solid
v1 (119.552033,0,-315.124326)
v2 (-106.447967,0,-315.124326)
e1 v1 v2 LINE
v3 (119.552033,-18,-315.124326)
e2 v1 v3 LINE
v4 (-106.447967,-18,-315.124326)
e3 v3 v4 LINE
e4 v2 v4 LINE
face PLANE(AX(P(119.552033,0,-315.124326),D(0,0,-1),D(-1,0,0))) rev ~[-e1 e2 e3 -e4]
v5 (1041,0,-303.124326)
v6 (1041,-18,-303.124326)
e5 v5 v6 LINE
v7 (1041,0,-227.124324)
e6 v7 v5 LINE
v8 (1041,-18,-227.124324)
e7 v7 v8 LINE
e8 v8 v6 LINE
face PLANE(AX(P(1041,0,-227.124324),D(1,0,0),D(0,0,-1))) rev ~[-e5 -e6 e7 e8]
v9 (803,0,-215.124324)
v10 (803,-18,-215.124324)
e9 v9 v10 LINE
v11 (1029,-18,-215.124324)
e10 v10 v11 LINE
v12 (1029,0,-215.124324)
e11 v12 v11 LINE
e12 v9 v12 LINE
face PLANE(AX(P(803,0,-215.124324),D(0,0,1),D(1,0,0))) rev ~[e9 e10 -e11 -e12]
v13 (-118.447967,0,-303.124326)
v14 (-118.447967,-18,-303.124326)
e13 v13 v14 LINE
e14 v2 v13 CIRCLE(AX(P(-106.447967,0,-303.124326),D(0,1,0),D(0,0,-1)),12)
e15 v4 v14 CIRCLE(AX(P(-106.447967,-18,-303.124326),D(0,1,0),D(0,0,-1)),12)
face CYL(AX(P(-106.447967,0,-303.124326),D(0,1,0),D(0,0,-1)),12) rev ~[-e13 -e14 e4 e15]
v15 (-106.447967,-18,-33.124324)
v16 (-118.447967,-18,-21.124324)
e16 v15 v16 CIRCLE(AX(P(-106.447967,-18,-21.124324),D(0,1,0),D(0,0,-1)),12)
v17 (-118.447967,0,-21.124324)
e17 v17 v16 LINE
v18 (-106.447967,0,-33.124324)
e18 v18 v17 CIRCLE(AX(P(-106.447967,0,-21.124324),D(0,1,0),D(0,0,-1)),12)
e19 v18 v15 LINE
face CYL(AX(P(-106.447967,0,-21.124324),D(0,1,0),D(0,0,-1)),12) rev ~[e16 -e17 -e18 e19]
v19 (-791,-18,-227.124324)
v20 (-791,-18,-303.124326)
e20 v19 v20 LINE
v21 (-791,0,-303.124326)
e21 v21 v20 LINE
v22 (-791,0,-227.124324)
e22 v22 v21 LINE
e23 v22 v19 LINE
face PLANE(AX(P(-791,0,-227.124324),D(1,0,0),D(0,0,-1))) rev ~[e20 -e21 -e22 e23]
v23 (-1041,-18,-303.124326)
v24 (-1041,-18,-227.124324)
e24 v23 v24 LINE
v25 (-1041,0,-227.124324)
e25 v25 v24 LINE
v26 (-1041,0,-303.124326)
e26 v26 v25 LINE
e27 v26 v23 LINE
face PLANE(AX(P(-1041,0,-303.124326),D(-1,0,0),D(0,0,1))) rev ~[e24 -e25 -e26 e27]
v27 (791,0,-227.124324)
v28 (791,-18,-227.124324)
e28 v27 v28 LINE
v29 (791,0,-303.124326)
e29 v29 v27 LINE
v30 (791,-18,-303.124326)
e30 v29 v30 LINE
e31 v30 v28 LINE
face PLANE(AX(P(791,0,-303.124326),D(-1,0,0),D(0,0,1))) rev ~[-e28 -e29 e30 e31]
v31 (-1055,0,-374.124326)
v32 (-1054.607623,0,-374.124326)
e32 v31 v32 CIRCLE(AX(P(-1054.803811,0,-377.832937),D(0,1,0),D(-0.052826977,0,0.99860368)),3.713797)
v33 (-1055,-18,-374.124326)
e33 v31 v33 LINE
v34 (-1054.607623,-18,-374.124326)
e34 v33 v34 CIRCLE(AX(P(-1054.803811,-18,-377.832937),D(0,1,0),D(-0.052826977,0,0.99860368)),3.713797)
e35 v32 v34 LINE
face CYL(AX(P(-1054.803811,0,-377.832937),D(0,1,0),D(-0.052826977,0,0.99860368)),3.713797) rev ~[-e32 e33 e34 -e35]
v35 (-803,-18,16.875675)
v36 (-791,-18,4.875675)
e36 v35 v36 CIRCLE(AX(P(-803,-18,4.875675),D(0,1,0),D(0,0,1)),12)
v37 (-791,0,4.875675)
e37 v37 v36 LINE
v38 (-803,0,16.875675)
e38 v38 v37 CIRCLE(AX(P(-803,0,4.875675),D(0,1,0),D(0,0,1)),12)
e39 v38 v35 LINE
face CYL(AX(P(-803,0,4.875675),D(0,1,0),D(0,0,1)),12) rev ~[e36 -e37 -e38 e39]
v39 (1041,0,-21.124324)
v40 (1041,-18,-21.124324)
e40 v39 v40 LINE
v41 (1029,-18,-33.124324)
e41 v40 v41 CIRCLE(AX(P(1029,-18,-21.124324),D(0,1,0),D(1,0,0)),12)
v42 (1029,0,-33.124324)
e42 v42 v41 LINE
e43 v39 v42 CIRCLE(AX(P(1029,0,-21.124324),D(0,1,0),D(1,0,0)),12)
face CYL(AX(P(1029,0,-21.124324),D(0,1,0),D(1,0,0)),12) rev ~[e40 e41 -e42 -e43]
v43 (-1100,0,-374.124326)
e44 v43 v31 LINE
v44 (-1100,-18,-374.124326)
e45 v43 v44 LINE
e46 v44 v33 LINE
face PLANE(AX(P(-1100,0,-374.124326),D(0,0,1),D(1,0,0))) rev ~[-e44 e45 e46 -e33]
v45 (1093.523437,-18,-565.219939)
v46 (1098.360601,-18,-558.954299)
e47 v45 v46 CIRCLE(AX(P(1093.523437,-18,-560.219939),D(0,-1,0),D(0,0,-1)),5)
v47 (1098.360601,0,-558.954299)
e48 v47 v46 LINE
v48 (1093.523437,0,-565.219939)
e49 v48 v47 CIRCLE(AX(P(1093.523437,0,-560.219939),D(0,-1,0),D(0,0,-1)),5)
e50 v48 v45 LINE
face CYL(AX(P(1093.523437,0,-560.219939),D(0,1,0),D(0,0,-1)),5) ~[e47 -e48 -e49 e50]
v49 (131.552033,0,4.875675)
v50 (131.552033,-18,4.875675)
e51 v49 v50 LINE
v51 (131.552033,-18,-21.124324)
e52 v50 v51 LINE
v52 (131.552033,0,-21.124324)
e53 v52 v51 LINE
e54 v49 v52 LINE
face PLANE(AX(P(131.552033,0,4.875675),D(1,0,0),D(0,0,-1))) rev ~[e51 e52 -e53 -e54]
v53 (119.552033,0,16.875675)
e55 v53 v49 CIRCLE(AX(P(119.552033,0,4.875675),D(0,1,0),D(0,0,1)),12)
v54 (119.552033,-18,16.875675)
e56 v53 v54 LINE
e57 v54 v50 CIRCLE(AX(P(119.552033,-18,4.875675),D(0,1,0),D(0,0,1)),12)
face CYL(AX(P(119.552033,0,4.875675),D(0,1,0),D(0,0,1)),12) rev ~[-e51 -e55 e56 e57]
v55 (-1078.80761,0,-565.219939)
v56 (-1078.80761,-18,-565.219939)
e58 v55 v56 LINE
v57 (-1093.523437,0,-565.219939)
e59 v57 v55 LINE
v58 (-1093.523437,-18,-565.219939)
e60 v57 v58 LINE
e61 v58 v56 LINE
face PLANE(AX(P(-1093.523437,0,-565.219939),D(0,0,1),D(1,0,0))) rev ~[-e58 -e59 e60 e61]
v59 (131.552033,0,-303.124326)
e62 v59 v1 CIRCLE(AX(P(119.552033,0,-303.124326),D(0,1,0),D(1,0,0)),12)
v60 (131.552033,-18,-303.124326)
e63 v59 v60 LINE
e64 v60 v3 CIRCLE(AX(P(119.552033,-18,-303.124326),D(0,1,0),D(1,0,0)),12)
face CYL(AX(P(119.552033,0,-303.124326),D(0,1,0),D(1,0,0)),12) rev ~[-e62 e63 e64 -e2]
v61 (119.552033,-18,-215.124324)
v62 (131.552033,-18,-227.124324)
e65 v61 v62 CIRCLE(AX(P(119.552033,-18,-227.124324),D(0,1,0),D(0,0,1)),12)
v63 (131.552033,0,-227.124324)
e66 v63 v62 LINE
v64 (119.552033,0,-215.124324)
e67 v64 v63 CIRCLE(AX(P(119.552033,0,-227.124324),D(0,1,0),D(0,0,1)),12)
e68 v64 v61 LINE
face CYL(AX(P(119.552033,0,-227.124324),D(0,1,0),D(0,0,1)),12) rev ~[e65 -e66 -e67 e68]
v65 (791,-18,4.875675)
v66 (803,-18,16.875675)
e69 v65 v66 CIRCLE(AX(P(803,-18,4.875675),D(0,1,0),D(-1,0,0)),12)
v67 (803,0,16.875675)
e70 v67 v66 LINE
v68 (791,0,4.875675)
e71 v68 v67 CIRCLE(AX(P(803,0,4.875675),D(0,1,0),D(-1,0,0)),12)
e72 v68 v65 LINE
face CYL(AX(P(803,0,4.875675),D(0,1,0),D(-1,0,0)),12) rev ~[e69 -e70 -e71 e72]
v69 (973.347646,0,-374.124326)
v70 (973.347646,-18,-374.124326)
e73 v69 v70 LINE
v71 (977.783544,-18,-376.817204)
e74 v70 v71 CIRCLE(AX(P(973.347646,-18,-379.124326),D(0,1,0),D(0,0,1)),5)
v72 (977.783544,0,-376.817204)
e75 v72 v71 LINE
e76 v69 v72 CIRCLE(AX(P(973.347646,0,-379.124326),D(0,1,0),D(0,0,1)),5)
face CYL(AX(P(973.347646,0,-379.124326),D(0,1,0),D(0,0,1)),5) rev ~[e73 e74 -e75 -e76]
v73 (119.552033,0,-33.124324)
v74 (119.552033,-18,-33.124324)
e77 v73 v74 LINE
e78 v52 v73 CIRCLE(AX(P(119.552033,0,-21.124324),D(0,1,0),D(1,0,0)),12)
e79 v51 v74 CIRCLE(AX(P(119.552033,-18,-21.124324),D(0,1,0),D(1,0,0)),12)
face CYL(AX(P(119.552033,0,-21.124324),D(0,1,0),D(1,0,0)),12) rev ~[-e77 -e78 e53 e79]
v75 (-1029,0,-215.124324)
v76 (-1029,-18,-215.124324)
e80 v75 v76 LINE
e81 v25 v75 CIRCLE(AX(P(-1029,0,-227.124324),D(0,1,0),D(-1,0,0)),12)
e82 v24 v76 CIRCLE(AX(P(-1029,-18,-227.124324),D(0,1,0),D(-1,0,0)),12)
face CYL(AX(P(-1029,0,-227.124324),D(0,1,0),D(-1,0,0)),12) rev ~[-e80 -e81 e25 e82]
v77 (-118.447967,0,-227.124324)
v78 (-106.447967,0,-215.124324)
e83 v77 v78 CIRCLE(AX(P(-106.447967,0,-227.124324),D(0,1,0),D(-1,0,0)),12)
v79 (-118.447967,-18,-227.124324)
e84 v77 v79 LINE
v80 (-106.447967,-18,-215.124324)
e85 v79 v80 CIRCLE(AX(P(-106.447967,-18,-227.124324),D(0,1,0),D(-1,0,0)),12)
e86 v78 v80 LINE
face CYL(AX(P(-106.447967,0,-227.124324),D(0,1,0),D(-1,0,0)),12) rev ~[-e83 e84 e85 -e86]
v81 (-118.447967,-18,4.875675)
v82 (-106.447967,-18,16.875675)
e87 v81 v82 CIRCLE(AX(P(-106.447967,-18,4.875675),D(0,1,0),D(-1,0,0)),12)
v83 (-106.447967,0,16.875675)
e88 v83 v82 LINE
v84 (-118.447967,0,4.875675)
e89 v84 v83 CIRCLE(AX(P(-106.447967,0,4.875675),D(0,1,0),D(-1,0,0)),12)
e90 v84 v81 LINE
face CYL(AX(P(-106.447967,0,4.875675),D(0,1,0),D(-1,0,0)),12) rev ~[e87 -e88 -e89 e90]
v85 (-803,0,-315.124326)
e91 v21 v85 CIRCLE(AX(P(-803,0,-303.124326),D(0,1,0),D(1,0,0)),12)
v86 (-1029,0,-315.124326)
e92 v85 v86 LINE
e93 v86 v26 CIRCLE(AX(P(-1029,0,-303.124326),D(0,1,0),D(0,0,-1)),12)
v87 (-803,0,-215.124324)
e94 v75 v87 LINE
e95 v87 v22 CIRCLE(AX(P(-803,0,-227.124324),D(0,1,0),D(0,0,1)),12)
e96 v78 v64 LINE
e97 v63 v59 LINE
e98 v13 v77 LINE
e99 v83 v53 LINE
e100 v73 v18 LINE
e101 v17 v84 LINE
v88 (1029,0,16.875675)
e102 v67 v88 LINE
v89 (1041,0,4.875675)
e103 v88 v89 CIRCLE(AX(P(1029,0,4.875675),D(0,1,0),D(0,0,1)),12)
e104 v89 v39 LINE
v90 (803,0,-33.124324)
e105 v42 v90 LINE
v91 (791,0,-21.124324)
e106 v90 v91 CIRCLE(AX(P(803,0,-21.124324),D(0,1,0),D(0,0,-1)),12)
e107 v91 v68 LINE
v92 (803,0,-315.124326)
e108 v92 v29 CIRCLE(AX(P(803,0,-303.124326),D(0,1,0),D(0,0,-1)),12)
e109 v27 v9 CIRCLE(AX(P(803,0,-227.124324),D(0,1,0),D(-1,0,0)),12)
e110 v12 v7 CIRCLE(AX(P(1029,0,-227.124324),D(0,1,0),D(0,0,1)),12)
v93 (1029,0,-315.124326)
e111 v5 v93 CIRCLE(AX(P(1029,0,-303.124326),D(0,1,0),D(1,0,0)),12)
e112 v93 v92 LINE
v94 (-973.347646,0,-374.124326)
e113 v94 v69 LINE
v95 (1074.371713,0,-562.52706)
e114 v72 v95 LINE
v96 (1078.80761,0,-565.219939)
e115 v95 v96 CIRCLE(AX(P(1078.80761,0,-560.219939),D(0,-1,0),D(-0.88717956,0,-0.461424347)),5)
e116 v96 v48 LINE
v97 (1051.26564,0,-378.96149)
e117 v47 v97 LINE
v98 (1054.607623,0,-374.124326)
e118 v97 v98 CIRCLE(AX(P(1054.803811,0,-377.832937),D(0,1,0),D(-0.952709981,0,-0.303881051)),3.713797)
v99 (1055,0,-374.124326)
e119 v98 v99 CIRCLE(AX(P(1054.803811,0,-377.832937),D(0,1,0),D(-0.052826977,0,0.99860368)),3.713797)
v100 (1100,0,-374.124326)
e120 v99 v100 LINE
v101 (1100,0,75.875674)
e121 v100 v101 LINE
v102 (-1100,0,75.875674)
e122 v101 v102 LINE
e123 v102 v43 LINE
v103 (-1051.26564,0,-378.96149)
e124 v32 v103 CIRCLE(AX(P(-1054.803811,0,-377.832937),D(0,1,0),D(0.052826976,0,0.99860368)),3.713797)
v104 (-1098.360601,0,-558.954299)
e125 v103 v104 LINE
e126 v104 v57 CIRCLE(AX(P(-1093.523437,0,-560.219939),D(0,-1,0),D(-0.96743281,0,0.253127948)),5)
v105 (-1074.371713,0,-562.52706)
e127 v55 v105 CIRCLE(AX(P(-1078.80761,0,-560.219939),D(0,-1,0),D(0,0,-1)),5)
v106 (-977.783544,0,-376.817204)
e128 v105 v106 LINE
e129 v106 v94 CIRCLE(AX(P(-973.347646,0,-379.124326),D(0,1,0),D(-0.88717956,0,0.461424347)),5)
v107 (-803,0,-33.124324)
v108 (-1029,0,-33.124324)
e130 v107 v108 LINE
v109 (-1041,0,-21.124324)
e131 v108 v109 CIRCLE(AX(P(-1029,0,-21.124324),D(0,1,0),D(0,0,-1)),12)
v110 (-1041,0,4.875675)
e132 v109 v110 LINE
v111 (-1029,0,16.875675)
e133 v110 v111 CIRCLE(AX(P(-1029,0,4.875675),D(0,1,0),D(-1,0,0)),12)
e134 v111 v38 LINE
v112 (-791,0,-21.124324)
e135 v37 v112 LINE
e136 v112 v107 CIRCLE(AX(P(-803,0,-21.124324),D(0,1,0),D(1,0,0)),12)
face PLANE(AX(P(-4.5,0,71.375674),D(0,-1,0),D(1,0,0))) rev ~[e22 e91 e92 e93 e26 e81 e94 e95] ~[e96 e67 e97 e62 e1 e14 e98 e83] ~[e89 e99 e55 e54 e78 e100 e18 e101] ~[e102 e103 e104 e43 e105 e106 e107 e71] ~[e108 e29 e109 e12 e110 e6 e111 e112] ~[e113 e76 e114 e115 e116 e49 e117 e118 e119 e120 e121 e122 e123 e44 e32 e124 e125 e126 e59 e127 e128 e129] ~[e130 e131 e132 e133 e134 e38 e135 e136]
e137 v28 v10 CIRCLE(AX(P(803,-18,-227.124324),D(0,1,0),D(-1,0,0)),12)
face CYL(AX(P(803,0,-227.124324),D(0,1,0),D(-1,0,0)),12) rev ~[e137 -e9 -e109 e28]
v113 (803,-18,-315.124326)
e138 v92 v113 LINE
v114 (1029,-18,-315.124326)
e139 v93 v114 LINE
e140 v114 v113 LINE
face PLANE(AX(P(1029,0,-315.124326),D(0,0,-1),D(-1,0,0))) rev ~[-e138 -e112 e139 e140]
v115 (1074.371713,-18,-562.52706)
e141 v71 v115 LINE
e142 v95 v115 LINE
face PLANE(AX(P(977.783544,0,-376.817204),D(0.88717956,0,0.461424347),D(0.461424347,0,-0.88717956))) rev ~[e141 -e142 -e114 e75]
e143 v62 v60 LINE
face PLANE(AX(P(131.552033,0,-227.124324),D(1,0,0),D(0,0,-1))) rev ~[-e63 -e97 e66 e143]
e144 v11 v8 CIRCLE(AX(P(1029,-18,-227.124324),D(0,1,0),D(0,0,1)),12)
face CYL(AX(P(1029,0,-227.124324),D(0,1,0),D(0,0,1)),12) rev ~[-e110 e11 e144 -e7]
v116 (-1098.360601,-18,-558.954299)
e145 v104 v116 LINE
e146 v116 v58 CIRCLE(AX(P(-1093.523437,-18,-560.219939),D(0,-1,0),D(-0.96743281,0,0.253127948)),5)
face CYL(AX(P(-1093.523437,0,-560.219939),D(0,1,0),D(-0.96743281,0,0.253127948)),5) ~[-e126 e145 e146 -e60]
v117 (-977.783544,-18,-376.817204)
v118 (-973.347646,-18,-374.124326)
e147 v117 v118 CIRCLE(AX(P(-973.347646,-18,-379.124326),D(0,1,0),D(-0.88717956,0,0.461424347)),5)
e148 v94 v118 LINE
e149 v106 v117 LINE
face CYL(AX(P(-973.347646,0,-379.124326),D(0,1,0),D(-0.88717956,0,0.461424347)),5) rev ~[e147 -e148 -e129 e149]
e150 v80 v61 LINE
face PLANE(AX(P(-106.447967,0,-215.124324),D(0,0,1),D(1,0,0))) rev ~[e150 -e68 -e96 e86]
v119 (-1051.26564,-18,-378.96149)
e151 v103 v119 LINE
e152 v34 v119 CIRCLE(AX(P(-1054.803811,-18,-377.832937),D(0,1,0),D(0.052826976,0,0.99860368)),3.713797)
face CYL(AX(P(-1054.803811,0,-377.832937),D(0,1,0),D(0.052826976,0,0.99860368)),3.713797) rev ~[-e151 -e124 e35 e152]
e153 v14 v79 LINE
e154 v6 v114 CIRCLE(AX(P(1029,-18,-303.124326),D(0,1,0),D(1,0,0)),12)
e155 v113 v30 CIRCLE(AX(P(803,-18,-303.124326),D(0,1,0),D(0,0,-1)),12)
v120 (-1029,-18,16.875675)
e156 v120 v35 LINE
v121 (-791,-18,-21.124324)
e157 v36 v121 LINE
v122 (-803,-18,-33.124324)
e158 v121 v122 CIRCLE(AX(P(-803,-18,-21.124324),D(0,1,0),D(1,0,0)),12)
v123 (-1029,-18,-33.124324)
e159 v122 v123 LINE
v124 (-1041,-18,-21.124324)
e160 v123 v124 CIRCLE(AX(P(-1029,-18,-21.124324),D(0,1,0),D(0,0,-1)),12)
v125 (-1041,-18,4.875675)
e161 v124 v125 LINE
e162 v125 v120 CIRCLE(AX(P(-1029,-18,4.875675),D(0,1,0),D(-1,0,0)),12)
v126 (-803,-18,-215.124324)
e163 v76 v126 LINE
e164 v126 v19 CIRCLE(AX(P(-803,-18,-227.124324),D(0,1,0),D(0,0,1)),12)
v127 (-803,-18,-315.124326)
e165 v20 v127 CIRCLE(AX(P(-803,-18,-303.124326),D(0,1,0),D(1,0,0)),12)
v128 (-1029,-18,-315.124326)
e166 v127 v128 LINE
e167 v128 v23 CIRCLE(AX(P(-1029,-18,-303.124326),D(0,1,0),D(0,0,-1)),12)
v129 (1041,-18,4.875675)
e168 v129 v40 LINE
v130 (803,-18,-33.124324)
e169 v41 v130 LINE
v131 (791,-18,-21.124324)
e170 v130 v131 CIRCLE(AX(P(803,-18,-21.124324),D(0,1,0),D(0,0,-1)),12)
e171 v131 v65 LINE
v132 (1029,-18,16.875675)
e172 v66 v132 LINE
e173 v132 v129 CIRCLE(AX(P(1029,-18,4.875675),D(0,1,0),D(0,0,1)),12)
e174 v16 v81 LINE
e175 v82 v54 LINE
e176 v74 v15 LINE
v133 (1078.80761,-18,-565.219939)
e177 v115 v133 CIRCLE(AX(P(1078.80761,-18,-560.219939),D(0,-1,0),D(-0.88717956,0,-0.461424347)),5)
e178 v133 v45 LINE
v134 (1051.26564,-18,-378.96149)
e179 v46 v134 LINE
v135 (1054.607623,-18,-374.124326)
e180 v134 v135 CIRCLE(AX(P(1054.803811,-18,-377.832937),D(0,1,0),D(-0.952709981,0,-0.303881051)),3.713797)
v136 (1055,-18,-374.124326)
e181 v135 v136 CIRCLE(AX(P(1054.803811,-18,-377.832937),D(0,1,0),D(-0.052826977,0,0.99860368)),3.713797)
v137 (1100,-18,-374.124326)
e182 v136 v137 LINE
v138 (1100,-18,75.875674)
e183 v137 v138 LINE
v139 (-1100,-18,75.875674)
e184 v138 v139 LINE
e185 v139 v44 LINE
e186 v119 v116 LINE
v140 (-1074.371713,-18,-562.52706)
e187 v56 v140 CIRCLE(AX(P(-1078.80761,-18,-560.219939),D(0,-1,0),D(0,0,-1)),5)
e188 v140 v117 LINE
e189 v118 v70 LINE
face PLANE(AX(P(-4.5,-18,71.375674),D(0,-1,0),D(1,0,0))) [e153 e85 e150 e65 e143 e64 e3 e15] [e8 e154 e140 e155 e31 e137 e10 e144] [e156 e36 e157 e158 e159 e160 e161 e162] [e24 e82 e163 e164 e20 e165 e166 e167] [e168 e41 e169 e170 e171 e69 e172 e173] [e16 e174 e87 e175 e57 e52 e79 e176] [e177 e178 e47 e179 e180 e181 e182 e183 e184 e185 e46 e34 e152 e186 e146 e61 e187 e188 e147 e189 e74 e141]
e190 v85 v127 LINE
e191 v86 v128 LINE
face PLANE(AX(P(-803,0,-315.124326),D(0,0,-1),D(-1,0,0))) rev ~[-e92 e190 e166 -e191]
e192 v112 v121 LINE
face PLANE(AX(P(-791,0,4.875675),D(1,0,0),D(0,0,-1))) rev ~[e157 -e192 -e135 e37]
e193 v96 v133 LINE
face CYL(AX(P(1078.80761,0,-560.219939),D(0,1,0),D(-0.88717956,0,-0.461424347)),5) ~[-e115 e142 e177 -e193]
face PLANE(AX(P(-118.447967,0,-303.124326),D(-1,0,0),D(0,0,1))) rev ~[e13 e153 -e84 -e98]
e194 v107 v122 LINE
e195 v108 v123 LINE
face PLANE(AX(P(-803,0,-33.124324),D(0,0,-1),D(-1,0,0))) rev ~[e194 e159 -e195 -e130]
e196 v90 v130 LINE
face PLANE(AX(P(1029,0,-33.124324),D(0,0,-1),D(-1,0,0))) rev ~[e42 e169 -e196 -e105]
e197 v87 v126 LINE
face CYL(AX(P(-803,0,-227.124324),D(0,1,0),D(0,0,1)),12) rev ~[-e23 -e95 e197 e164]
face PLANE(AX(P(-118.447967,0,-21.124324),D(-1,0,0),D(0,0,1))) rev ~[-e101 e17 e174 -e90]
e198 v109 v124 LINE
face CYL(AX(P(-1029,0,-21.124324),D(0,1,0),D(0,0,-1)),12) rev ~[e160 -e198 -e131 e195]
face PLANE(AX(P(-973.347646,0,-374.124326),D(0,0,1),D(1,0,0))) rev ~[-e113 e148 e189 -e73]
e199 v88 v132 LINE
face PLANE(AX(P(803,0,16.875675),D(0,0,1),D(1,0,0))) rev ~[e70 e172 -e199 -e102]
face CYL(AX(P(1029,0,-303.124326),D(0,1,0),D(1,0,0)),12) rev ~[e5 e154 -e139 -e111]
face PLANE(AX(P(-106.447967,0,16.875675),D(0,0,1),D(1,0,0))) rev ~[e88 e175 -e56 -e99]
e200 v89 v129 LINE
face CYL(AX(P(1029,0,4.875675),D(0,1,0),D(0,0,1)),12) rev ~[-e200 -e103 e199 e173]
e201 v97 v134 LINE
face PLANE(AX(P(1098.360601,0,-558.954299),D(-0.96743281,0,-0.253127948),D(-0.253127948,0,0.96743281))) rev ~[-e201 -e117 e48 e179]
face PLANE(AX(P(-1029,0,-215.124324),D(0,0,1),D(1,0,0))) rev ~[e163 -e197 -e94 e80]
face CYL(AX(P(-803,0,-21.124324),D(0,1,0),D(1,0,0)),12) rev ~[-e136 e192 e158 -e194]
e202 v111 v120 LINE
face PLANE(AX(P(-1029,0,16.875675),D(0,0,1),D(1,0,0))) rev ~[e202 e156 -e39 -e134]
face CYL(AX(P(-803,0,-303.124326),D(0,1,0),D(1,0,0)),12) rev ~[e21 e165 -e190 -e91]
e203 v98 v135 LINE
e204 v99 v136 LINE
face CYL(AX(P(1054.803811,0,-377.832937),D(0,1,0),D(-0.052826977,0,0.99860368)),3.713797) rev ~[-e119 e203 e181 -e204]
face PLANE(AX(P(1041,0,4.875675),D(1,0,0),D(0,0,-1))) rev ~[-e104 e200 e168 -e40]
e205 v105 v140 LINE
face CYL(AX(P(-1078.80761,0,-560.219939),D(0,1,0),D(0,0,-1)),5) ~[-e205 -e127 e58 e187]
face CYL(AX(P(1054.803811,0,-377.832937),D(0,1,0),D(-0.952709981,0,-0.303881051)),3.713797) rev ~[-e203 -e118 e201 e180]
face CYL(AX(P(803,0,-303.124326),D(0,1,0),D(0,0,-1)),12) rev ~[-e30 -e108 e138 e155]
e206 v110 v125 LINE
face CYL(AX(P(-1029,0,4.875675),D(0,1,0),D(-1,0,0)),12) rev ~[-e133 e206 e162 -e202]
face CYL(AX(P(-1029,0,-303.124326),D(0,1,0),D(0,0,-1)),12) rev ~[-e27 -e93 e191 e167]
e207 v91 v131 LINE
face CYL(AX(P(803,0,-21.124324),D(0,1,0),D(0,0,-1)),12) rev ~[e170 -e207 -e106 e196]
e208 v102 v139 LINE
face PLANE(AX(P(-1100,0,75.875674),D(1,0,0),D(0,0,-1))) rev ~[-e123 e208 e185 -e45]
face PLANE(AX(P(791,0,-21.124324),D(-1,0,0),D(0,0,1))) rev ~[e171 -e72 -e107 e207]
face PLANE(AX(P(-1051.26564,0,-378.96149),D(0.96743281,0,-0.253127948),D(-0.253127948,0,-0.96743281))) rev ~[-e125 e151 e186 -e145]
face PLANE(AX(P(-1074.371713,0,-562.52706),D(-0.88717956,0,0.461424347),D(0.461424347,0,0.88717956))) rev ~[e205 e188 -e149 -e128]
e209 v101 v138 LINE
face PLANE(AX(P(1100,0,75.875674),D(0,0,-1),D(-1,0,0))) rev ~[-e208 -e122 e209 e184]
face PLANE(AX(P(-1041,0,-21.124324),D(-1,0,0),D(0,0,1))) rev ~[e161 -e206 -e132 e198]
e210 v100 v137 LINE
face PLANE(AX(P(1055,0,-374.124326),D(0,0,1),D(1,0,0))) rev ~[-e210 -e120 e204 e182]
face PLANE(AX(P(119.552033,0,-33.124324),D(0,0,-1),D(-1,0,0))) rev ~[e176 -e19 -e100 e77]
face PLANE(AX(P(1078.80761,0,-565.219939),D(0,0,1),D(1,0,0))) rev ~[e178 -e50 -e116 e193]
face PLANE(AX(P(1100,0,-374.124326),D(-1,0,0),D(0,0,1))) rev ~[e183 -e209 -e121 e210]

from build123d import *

# Parameters (mm, degrees)
F0_W     = 9
F0_H     = 432
F0_H_2   = 9
F1_DEPTH = 18


# Not quite as in the source:
# - a feature names something its author has since deleted; it is built from what else it names


with BuildPart() as f1:
    # F0 (on Front) → F1 (new body)
    with BuildSketch(Plane.XZ):
        Polygon((0, 75.8756743552), (-1100, 75.8756743552), (-1100, 66.8756743552), (-1091, 66.8756743552), (0, 66.8756743552), (1091, 66.8756743552), (1091, 75.8756743552), align=None)
        with BuildLine():
            Line((-973.3476458471, -374.1243256448), (-1054.6076226562, -374.1243256448))
            ThreePointArc((-1054.6076226562, -374.1243256448), (-1051.7483407187, -375.721921149), (-1051.265639742, -378.9614896944))
            Line((-1051.265639742, -378.9614896944), (-1098.3606008427, -558.954299013))
            ThreePointArc((-1098.3606008427, -558.954299013), (-1097.4812264988, -563.2754093644), (-1093.523436793, -565.219938755))
            Line((-1093.523436793, -565.219938755), (-1078.8076104242, -565.219938755))
            ThreePointArc((-1078.8076104242, -565.219938755), (-1076.2129629213, -564.4940239596), (-1074.371712623, -562.5270604893))
            Line((-1074.371712623, -562.5270604893), (-977.7835436484, -376.8172039105))
            ThreePointArc((-977.7835436484, -376.8172039105), (-975.94229335, -374.8502404402), (-973.3476458471, -374.1243256448))
        make_face()
        with BuildLine():
            Line((1100, 66.8756743552), (1091, 66.8756743552))
            Line((1091, 66.8756743552), (1091, -365.0378882885))
            Line((1091, -365.0378882885), (1091, -365.1243256448))
            Line((1091, -365.1243256448), (0, -365.1243256448))
            Line((0, -365.1243256448), (-1091, -365.1243256448))
            Line((-1091, -365.1243256448), (-1091, -374.1243256448))
            Line((-1091, -374.1243256448), (-1055, -374.1243256448))
            ThreePointArc((-1055, -374.1243256448), (-1054.8038113281, -374.1191399972), (-1054.6076226562, -374.1243256448))
            Line((-1054.6076226562, -374.1243256448), (-973.3476458471, -374.1243256448))
            Line((-973.3476458471, -374.1243256448), (0, -374.1243256448))
            Line((0, -374.1243256448), (973.3476458471, -374.1243256448))
            Line((973.3476458471, -374.1243256448), (1054.6076226562, -374.1243256448))
            ThreePointArc((1054.6076226562, -374.1243256448), (1054.8038113281, -374.1191399972), (1055, -374.1243256448))
            Line((1055, -374.1243256448), (1100, -374.1243256448))
            Line((1100, -374.1243256448), (1100, 66.8756743552))
        make_face()
        with Locations((-1095.5, -149.1243256448)):
            Rectangle(F0_W, F0_H)
        with Locations((-1095.5, -369.6243256448)):
            Rectangle(F0_W, F0_H_2)
        with Locations((1095.5, 71.3756743552)):
            Rectangle(F0_W, F0_H_2)
        with BuildLine():
            ThreePointArc((1051.265639742, -378.9614896944), (1051.7483407187, -375.721921149), (1054.6076226562, -374.1243256448))
            Line((1054.6076226562, -374.1243256448), (973.3476458471, -374.1243256448))
            ThreePointArc((973.3476458471, -374.1243256448), (975.94229335, -374.8502404402), (977.7835436484, -376.8172039105))
            Line((977.7835436484, -376.8172039105), (1074.371712623, -562.5270604893))
            ThreePointArc((1074.371712623, -562.5270604893), (1076.2129629213, -564.4940239596), (1078.8076104242, -565.219938755))
            Line((1078.8076104242, -565.219938755), (1093.523436793, -565.219938755))
            ThreePointArc((1093.523436793, -565.219938755), (1097.4812264988, -563.2754093644), (1098.3606008427, -558.954299013))
            Line((1098.3606008427, -558.954299013), (1051.265639742, -378.9614896944))
        make_face()
        Polygon((0, 66.8756743552), (-1091, 66.8756743552), (-1091, -365.1243256448), (0, -365.1243256448), (1091, -365.1243256448), (1091, -365.0378882885), (1091, 66.8756743552), align=None)
        with BuildLine():
            ThreePointArc((-1041, -227.1243239641), (-1037.4852813742, -218.6390425899), (-1029, -215.1243239641))
            Line((-1029, -215.1243239641), (-803, -215.1243239641))
            ThreePointArc((-803, -215.1243239641), (-794.5147186258, -218.6390425899), (-791, -227.1243239641))
            Line((-791, -227.1243239641), (-791, -303.1243256448))
            ThreePointArc((-791, -303.1243256448), (-794.5147186258, -311.609607019), (-803, -315.1243256448))
            Line((-803, -315.1243256448), (-1029, -315.1243256448))
            ThreePointArc((-1029, -315.1243256448), (-1037.4852813742, -311.609607019), (-1041, -303.1243256448))
            Line((-1041, -303.1243256448), (-1041, -227.1243239641))
        make_face(mode=Mode.SUBTRACT)
        with BuildLine():
            ThreePointArc((-118.4479668736, -227.1243239641), (-114.9332482479, -218.6390425899), (-106.4479668736, -215.1243239641))
            Line((-106.4479668736, -215.1243239641), (119.5520331264, -215.1243239641))
            ThreePointArc((119.5520331264, -215.1243239641), (128.0373145006, -218.6390425899), (131.5520331264, -227.1243239641))
            Line((131.5520331264, -227.1243239641), (131.5520331264, -303.1243256448))
            ThreePointArc((131.5520331264, -303.1243256448), (128.0373145006, -311.609607019), (119.5520331264, -315.1243256448))
            Line((119.5520331264, -315.1243256448), (-106.4479668736, -315.1243256448))
            ThreePointArc((-106.4479668736, -315.1243256448), (-114.9332482479, -311.609607019), (-118.4479668736, -303.1243256448))
            Line((-118.4479668736, -303.1243256448), (-118.4479668736, -227.1243239641))
        make_face(mode=Mode.SUBTRACT)
        with BuildLine():
            Line((791, -303.1243256448), (791, -227.1243239641))
            ThreePointArc((791, -227.1243239641), (794.5147186258, -218.6390425899), (803, -215.1243239641))
            Line((803, -215.1243239641), (1029, -215.1243239641))
            ThreePointArc((1029, -215.1243239641), (1037.4852813742, -218.6390425899), (1041, -227.1243239641))
            Line((1041, -227.1243239641), (1041, -303.1243256448))
            ThreePointArc((1041, -303.1243256448), (1037.4852813742, -311.609607019), (1029, -315.1243256448))
            Line((1029, -315.1243256448), (803, -315.1243256448))
            ThreePointArc((803, -315.1243256448), (794.5147186258, -311.609607019), (791, -303.1243256448))
        make_face(mode=Mode.SUBTRACT)
        with BuildLine():
            ThreePointArc((-1041, 4.8756749481), (-1037.4852813742, 13.3609563223), (-1029, 16.8756749481))
            Line((-1029, 16.8756749481), (-803, 16.8756749481))
            ThreePointArc((-803, 16.8756749481), (-794.5147186258, 13.3609563223), (-791, 4.8756749481))
            Line((-791, 4.8756749481), (-791, -21.1243239343))
            ThreePointArc((-791, -21.1243239343), (-794.5147186258, -29.6096053086), (-803, -33.1243239343))
            Line((-803, -33.1243239343), (-1029, -33.1243239343))
            ThreePointArc((-1029, -33.1243239343), (-1037.4852813742, -29.6096053086), (-1041, -21.1243239343))
            Line((-1041, -21.1243239343), (-1041, 4.8756749481))
        make_face(mode=Mode.SUBTRACT)
        with BuildLine():
            ThreePointArc((-118.4479668736, 4.8756749481), (-114.9332482479, 13.3609563223), (-106.4479668736, 16.8756749481))
            Line((-106.4479668736, 16.8756749481), (119.5520331264, 16.8756749481))
            ThreePointArc((119.5520331264, 16.8756749481), (128.0373145006, 13.3609563223), (131.5520331264, 4.8756749481))
            Line((131.5520331264, 4.8756749481), (131.5520331264, -21.1243239343))
            ThreePointArc((131.5520331264, -21.1243239343), (128.0373145006, -29.6096053086), (119.5520331264, -33.1243239343))
            Line((119.5520331264, -33.1243239343), (-106.4479668736, -33.1243239343))
            ThreePointArc((-106.4479668736, -33.1243239343), (-114.9332482479, -29.6096053086), (-118.4479668736, -21.1243239343))
            Line((-118.4479668736, -21.1243239343), (-118.4479668736, 4.8756749481))
        make_face(mode=Mode.SUBTRACT)
        with BuildLine():
            Line((803, 16.8756749481), (1029, 16.8756749481))
            ThreePointArc((1029, 16.8756749481), (1037.4852813742, 13.3609563223), (1041, 4.8756749481))
            Line((1041, 4.8756749481), (1041, -21.1243239343))
            ThreePointArc((1041, -21.1243239343), (1037.4852813742, -29.6096053086), (1029, -33.1243239343))
            Line((1029, -33.1243239343), (803, -33.1243239343))
            ThreePointArc((803, -33.1243239343), (794.5147186258, -29.6096053086), (791, -21.1243239343))
            Line((791, -21.1243239343), (791, 4.8756749481))
            ThreePointArc((791, 4.8756749481), (794.5147186258, 13.3609563223), (803, 16.8756749481))
        make_face(mode=Mode.SUBTRACT)
    extrude(amount=F1_DEPTH)


solid = f1.part
